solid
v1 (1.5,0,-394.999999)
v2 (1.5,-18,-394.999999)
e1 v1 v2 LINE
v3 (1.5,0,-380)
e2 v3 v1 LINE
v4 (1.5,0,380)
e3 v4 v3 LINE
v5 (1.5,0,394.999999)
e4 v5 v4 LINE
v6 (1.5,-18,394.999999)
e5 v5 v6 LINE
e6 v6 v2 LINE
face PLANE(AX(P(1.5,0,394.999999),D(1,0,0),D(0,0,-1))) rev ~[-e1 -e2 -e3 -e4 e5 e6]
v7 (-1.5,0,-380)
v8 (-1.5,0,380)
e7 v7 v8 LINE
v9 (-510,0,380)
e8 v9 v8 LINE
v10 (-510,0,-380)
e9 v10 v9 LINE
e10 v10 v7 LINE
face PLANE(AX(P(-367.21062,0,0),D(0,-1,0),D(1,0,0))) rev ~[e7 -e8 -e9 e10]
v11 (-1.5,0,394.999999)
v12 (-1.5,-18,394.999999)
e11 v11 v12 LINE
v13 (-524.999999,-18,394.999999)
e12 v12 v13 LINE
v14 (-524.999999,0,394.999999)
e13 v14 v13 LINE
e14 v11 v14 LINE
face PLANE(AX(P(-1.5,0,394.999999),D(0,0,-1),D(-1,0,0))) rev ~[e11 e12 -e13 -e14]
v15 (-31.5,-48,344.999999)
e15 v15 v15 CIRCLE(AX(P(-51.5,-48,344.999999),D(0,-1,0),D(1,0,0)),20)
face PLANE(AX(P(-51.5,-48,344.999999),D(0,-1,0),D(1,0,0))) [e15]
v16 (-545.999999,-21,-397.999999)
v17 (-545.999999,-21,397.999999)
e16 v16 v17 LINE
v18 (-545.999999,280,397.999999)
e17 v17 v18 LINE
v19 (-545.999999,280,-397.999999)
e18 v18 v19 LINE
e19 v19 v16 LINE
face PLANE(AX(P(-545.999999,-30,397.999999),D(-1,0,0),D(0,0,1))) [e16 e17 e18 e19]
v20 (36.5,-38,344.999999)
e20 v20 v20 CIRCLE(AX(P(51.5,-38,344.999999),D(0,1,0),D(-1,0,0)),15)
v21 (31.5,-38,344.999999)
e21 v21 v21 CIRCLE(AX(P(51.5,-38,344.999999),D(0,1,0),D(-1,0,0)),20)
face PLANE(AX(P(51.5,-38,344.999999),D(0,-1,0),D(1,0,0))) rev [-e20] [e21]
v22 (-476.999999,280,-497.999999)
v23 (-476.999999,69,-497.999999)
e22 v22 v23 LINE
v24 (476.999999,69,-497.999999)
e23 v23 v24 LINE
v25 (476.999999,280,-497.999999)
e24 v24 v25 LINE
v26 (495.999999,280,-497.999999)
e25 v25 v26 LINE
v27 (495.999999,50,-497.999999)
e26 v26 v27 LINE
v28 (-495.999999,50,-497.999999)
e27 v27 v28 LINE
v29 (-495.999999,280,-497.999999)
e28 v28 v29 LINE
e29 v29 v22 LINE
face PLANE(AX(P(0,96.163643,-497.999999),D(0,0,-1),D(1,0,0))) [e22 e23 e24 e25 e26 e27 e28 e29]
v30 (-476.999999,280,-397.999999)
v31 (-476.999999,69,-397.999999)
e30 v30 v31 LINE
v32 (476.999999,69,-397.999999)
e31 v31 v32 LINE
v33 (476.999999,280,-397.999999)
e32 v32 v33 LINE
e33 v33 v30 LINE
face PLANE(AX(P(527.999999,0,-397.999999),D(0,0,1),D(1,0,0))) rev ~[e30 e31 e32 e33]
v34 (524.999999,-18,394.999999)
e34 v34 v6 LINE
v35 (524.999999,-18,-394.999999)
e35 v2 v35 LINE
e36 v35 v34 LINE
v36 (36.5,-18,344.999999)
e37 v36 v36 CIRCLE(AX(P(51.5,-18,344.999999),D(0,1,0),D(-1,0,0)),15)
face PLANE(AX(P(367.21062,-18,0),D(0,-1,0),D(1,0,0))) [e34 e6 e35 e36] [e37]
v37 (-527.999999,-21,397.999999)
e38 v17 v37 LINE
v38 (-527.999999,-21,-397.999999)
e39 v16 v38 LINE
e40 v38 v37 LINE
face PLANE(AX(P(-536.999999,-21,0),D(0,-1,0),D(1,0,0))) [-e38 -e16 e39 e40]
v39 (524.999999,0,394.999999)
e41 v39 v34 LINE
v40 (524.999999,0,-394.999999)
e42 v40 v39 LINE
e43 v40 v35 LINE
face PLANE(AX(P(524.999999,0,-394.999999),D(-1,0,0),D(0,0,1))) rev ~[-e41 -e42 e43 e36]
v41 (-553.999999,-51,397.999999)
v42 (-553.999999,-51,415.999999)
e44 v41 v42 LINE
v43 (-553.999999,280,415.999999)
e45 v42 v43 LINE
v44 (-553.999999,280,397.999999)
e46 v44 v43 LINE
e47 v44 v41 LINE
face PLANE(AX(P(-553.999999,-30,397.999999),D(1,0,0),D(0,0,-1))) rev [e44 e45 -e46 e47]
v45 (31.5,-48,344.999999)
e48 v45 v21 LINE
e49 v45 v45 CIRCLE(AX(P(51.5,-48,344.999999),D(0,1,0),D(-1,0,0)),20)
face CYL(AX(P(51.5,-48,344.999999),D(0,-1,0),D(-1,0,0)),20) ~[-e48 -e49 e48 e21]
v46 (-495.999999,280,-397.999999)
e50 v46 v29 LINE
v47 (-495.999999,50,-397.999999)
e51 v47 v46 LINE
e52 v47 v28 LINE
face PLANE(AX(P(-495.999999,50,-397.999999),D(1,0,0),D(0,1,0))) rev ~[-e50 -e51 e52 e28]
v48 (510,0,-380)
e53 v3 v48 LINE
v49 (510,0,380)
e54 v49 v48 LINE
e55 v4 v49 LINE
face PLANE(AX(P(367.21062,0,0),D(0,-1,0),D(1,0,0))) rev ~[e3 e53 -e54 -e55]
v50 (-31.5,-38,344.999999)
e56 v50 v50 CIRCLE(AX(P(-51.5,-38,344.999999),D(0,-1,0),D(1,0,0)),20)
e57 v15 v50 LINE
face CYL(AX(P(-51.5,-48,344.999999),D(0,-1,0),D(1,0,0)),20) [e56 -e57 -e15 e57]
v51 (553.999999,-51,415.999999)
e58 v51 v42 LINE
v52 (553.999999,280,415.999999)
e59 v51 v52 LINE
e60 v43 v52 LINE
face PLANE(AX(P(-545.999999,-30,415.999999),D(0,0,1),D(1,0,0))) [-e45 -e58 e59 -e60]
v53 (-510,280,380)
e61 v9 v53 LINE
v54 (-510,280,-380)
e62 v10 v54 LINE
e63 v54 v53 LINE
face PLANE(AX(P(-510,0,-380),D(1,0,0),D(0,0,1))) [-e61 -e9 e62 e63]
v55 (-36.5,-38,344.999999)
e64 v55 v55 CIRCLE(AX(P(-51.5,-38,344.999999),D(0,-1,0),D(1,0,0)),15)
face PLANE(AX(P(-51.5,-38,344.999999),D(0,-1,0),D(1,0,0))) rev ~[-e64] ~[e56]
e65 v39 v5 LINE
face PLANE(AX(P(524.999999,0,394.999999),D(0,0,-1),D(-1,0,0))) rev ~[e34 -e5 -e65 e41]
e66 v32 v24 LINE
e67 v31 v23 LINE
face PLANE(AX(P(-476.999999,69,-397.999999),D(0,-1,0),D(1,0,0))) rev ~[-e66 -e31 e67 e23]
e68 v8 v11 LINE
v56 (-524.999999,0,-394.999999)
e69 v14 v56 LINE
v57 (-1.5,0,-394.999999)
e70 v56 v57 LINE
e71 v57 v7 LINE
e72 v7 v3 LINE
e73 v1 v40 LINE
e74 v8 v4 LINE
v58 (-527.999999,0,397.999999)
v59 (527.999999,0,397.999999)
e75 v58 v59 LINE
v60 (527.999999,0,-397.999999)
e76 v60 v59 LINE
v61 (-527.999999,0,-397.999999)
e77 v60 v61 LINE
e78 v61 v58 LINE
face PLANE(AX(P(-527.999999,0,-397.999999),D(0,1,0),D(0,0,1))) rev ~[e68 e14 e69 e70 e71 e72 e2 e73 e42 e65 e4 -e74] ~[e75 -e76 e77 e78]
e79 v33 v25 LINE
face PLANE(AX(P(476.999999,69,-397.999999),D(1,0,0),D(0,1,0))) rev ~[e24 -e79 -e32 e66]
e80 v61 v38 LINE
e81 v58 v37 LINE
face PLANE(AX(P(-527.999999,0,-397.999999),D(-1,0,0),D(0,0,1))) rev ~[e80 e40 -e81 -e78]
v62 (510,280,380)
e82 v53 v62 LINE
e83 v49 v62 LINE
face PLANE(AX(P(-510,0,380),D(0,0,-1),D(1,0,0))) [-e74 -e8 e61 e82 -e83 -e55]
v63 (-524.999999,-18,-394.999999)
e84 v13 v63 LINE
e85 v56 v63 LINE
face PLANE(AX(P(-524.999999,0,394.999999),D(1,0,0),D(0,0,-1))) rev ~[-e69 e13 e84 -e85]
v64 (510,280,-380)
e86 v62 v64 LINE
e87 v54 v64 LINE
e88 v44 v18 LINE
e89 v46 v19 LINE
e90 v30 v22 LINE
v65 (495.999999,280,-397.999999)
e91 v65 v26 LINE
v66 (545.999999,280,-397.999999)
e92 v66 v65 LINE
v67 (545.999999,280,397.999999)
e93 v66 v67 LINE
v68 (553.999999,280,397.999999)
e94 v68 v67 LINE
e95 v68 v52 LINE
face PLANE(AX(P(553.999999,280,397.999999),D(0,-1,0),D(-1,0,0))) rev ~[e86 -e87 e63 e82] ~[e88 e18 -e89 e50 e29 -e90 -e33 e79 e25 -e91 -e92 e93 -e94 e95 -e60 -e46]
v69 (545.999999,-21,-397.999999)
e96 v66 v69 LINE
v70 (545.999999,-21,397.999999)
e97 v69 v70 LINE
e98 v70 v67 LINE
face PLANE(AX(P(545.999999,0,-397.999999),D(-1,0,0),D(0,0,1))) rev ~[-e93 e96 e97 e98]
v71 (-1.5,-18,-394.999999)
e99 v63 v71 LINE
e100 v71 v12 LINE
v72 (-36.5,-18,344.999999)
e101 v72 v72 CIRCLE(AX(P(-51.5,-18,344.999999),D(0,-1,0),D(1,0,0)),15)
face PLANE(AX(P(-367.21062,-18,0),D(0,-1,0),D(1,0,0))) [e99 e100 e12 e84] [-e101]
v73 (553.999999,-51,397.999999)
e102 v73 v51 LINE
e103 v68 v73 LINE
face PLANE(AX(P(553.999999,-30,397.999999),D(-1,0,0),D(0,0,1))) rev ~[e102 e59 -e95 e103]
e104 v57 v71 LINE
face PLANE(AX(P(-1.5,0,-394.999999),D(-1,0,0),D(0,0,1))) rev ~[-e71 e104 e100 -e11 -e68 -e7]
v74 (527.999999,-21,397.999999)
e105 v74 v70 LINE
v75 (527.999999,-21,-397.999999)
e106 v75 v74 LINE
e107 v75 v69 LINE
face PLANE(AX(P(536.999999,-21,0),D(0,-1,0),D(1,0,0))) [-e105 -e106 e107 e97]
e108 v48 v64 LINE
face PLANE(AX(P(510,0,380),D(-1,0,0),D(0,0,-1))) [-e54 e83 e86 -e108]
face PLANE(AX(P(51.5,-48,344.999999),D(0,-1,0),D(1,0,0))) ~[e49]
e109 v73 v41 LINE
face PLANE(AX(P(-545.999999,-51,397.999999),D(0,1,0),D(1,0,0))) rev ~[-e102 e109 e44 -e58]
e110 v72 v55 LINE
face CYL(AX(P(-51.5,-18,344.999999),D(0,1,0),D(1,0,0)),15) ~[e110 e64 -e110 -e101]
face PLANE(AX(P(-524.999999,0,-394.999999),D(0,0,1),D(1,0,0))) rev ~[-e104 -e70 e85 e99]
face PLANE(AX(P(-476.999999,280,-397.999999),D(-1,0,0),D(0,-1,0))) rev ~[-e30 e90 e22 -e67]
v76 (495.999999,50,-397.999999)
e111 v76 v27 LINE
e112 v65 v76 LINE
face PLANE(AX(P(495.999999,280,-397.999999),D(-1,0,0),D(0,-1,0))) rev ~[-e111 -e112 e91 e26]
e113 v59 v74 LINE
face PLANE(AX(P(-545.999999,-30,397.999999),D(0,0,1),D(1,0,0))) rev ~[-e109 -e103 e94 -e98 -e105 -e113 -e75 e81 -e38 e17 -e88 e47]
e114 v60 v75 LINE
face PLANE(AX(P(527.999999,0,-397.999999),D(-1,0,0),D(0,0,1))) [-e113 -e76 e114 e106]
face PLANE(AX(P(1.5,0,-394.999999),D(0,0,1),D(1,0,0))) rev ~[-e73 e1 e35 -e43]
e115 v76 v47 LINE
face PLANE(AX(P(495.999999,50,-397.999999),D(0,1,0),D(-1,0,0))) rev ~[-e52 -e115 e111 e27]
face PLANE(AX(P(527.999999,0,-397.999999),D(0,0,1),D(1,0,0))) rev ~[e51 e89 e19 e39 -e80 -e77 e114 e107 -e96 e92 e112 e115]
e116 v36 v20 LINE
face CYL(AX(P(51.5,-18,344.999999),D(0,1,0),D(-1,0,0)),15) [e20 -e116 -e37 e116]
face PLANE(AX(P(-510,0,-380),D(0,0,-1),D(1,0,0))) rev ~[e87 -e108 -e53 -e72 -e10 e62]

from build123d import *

# Parameters (mm, degrees)
F0_W      = 1020
F0_H      = 17.9999992251
F1_DEPTH  = 280
F2_DEPTH  = 280
F3_W      = 280
F3_H      = 795.9999984503
F4_DEPTH  = 18
F5_W      = 280
F5_H      = 795.9999984503
F6_DEPTH  = 18
F7_W      = 1091.9999984503
F7_H      = 280
F8_DEPTH  = 18
F9_W      = 18
F9_H      = 795.9999984503
F10_DEPTH = 21
F11_DEPTH = 21
F12_DEPTH = 21
F14_DEPTH = 100
F15_W     = 508.5
F15_H     = 760
F16_DEPTH = 18
F17_DEPTH = 18
F18_R     = 15
F19_DEPTH = 30
F20_R     = 20
F20_R_2   = 15
F21_DEPTH = 10


with BuildPart() as f1:
    # F0 (on Front) → F1 (new body)
    with BuildSketch(Plane.XZ):
        with Locations((0, 388.9999996126)):
            Rectangle(F0_W, F0_H)
    extrude(amount=-F1_DEPTH)

    # F0 (on Front) → F2 (join)
    with BuildSketch(Plane.XZ):
        Polygon((510, -397.9999992251), (527.9999992251, -397.9999992251), (527.9999992251, 397.9999992251), (510, 397.9999992251), (510, 380), (510, -380), align=None)
        with Locations((0, -388.9999996126)):
            Rectangle(F0_W, F0_H)
        Polygon((-527.9999992251, -397.9999992251), (-510, -397.9999992251), (-510, -380), (-510, 380), (-510, 397.9999992251), (-527.9999992251, 397.9999992251), align=None)
        with Locations((0, 388.9999996126)):
            Rectangle(F0_W, F0_H)
    extrude(amount=-F2_DEPTH)

    # F3 (on face) → F4 (join)
    with BuildSketch(Plane.YZ.offset(527.9999992251)):
        with Locations((140, 0)):
            Rectangle(F3_W, F3_H)
    extrude(amount=F4_DEPTH)

    # F5 (on face) → F6 (join)
    with BuildSketch(Plane(origin=(-527.9999992251, 0, 0), x_dir=(0, -1, 0), z_dir=(-1, 0, 0))):
        with Locations((-140, 0)):
            Rectangle(F5_W, F5_H)
    extrude(amount=F6_DEPTH)

    # F7 (on face) → F8 (join)
    with BuildSketch(Plane.XY.offset(397.9999992251)):
        with Locations((0, 140)):
            Rectangle(F7_W, F7_H)
        Polygon((553.9999992251, 280), (545.9999992251, 280), (545.9999992251, 0), (-545.9999992251, 0), (-545.9999992251, -30), (553.9999992251, -30), align=None)
    extrude(amount=F8_DEPTH)

    # F9 (on face) → F10 (join)
    with BuildSketch(Plane.XZ):
        with Locations((-536.9999992251, 0)):
            Rectangle(F9_W, F9_H)
    extrude(amount=F10_DEPTH)

    # F9 (on face) → F11 (join)
    with BuildSketch(Plane.XZ):
        with Locations((536.9999992251, 0)):
            Rectangle(F9_W, F9_H)
    extrude(amount=F11_DEPTH)

    # F12 (add): a face of the model
    f12_faces = [f1.faces().sort_by_distance(p)[0] for p in [
        (4, -30, 406.9999992251),
    ]]
    extrude(f12_faces, amount=F12_DEPTH)

    # F13 (on face) → F14 (join)
    with BuildSketch(Plane(origin=(0, 0, -397.9999992251), x_dir=(1, 0, 0), z_dir=(0, 0, -1))):
        Polygon((-495.9999992251, -50), (-495.9999992251, -280), (-476.9999992251, -280), (-476.9999992251, -69), (476.9999992251, -69), (476.9999992251, -280), (495.9999992251, -280), (495.9999992251, -50), align=None)
    extrude(amount=F14_DEPTH)

    # F15 (on face) → F16 (join)
    with BuildSketch(Plane.XZ):
        Polygon((-1.5, 380), (-1.5, 394.9999992251), (-524.9999992251, 394.9999992251), (-524.9999992251, -394.9999992251), (-1.5, -394.9999992251), (-1.5, -380), (-510, -380), (-510, 380), align=None)
        with Locations((-255.75, 0)):
            Rectangle(F15_W, F15_H)
    extrude(amount=F16_DEPTH)

    # F15 (on face) → F17 (join)
    with BuildSketch(Plane.XZ):
        Polygon((524.9999992251, -394.9999992251), (524.9999992251, 394.9999992251), (1.5, 394.9999992251), (1.5, 380), (510, 380), (510, -380), (1.5, -380), (1.5, -394.9999992251), align=None)
        with Locations((255.75, 0)):
            Rectangle(F15_W, F15_H)
    extrude(amount=F17_DEPTH)

    # F18 (on face) → F19 (join)
    with BuildSketch(Plane.XZ.offset(18)):
        with Locations((-51.5, 344.9999992251)):
            Circle(F18_R)
    extrude(amount=F19_DEPTH)

    # F20 (on face) → F21 (join)
    with BuildSketch(Plane.XZ.offset(48)):
        with Locations((-51.5, 344.9999992251)):
            Circle(F20_R)
        with Locations((-51.5, 344.9999992251)):
            Circle(F20_R_2, mode=Mode.SUBTRACT)
    extrude(amount=-F21_DEPTH)

    # F22: F1 across plane


with BuildPart() as f1_1:
    add(f1.part)
    add(f1.part.mirror(Plane.YZ))


solid = f1_1.part
